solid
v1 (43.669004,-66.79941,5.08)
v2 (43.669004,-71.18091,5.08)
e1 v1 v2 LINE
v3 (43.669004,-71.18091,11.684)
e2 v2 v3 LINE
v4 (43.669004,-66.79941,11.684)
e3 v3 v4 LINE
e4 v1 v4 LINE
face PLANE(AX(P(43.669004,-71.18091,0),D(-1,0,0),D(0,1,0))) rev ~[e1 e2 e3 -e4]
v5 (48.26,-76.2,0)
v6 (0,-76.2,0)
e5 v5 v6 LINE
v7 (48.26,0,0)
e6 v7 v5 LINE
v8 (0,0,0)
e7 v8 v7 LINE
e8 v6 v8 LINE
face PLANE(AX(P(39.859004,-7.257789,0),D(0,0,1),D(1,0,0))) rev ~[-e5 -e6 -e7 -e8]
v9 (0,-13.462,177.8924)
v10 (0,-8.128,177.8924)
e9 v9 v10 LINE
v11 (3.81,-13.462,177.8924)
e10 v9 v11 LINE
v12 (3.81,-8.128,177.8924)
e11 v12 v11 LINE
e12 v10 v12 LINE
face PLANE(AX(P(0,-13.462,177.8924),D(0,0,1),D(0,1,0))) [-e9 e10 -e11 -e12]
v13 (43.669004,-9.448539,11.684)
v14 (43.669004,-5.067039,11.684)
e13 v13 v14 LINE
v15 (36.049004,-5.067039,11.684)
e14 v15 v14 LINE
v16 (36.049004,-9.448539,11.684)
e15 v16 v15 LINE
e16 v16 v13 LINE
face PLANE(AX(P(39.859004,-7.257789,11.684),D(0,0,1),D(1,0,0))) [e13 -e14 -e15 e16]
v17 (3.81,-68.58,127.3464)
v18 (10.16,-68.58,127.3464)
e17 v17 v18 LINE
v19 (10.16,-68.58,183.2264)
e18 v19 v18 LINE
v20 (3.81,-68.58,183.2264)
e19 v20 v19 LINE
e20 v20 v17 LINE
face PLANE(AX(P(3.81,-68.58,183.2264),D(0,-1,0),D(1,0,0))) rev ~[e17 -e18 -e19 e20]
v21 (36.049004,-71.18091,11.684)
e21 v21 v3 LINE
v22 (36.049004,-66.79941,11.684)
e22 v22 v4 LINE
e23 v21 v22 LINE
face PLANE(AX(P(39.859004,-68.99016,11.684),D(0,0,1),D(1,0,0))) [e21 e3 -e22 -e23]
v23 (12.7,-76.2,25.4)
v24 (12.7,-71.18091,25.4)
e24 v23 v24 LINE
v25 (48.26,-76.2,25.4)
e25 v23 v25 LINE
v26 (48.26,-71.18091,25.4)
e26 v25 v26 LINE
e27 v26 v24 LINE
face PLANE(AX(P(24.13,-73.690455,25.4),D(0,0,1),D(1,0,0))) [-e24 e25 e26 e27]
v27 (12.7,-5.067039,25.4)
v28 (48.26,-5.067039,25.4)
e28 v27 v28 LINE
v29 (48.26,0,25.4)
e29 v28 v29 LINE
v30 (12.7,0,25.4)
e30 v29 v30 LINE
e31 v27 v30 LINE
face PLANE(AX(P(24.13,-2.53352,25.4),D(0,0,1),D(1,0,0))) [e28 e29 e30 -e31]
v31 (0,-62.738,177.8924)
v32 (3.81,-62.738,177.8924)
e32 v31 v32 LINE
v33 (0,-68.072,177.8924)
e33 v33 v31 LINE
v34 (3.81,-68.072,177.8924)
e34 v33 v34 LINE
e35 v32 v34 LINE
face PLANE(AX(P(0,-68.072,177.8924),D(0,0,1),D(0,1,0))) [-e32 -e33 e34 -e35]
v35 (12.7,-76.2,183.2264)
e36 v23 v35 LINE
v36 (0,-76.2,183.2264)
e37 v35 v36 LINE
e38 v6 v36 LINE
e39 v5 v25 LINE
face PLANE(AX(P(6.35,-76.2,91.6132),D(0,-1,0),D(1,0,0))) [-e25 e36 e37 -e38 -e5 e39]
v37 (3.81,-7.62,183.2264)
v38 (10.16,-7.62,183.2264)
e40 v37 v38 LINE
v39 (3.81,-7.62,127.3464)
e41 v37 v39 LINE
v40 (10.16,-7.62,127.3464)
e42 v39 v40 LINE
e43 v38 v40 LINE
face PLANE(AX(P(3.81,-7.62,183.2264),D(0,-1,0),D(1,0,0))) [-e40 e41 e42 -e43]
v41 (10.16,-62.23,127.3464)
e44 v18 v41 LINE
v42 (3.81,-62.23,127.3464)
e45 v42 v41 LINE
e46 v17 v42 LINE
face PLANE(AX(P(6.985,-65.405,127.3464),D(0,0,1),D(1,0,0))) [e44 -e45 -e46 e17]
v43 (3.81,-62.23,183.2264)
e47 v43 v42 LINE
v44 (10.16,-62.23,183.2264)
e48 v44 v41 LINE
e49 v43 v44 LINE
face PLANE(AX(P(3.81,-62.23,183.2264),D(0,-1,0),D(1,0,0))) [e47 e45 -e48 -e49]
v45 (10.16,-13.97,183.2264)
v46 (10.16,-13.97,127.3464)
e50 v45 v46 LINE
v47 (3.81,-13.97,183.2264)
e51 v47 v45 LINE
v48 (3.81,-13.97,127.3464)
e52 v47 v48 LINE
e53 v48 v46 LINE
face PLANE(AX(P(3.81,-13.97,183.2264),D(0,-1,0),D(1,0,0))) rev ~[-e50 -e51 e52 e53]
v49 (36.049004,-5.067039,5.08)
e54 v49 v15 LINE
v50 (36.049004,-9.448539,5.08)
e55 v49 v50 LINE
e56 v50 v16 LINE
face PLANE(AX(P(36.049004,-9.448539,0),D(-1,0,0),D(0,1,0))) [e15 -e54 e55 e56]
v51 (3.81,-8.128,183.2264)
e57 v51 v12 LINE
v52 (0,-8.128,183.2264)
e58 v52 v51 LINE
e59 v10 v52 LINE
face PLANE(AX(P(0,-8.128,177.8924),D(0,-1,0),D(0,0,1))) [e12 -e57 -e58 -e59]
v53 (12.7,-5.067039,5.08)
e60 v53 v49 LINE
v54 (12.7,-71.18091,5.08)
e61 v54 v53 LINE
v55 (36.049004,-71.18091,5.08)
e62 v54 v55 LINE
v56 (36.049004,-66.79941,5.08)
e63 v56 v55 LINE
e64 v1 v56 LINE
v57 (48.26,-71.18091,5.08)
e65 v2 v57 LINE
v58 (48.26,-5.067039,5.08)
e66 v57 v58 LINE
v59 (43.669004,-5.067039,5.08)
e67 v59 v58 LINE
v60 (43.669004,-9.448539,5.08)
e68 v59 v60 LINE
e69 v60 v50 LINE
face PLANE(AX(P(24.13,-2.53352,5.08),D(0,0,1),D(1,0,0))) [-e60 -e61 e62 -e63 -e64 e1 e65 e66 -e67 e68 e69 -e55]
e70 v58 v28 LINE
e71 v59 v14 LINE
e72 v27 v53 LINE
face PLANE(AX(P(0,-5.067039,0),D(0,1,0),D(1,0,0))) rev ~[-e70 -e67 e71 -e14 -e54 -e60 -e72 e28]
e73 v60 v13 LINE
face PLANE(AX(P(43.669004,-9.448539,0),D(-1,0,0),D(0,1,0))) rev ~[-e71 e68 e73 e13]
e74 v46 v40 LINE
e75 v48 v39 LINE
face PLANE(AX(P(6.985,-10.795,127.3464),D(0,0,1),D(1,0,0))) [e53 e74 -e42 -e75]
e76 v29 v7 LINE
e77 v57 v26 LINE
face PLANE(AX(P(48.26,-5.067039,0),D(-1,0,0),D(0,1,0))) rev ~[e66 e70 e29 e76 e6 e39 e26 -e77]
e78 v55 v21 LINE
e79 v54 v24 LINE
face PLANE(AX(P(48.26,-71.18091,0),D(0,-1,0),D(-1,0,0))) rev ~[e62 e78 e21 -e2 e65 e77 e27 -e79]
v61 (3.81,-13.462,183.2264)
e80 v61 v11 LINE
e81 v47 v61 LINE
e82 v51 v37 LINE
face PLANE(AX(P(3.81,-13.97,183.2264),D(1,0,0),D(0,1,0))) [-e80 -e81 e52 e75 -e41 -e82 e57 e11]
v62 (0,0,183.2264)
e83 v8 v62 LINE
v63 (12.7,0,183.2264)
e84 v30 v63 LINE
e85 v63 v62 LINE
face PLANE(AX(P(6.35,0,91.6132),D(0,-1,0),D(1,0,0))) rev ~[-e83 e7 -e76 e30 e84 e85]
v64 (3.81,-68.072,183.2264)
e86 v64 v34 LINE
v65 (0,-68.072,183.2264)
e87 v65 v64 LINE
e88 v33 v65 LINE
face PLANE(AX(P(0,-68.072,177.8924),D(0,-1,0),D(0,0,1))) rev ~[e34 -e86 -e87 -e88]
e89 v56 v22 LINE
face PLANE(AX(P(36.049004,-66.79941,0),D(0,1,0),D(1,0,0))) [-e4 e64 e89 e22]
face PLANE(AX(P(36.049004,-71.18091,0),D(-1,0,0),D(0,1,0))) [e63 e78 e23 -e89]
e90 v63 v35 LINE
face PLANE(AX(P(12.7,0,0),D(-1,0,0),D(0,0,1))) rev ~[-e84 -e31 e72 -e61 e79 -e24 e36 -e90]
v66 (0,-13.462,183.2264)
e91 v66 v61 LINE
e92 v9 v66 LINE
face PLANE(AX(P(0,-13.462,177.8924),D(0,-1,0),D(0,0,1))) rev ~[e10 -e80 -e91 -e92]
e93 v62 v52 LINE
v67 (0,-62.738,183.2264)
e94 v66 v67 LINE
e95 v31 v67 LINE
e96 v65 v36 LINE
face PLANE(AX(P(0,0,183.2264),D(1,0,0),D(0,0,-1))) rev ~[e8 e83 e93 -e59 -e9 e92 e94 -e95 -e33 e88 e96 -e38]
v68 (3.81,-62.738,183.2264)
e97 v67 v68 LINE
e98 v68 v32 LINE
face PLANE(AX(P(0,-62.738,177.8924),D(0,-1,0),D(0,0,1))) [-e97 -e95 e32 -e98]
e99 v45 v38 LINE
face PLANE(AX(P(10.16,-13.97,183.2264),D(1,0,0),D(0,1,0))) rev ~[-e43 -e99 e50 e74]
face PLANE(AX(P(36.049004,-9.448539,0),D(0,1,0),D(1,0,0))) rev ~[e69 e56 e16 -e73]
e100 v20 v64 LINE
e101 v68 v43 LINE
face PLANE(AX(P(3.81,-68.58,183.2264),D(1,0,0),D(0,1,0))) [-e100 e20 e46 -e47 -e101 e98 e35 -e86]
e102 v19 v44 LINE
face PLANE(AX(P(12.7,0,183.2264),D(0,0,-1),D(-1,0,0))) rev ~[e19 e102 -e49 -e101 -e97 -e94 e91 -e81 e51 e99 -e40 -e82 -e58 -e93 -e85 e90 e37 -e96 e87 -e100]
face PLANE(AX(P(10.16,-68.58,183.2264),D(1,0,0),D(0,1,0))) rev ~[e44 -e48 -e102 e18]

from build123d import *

# Parameters (mm, degrees)
F1_DEPTH  = 76.2
F3_DEPTH  = 25.4
F4_DEPTH  = 5.08
F5_W      = 7.62
F5_H      = 4.3815
F6_DEPTH  = 11.684
F7_W      = 6.35
F7_H      = 6.35
F8_DEPTH  = 55.88
F9_W      = 5.334
F9_H      = 5.334
F10_DEPTH = 5.08


# Not quite as in the source:
# - a feature names something its author has since deleted; it is built from what else it names


with BuildPart() as f1:
    # F0 (on Front) → F1 (new body)
    with BuildSketch(Plane.XZ):
        Polygon((0, 0), (12.7, 0), (12.7, 5.4184001555), (12.7, 23.5612627981), (12.7, 183.226400471), (0, 183.226400471), align=None)
    extrude(amount=F1_DEPTH)

    # F2 (on Top) → F3 (join)
    with BuildSketch(Plane.XY):
        Polygon((43.18, 0), (0, 0), (0, -5.0670392811), (48.26, -5.0670392811), (48.26, 0), align=None)
        Polygon((27.7881938964, -71.1809098721), (0, -71.1809098721), (0, -76.2), (30.48, -76.2), (48.26, -76.2), (48.26, -71.1809098721), (35.56, -71.1809098721), align=None)
    extrude(amount=F3_DEPTH)

    # F2 (on Top) → F4 (join)
    with BuildSketch(Plane.XY):
        Polygon((43.18, 0), (0, 0), (0, -5.0670392811), (48.26, -5.0670392811), (48.26, 0), align=None)
        Polygon((48.26, -5.0670392811), (0, -5.0670392811), (0, -71.1809098721), (27.7881938964, -71.1809098721), (35.56, -71.1809098721), (48.26, -71.1809098721), align=None)
    extrude(amount=F4_DEPTH)

    # F5 (on Top) → F6 (join)
    with BuildSketch(Plane.XY):
        with Locations((39.8590039933, -7.2577892811)):
            Rectangle(F5_W, F5_H)
        with Locations((39.8590039933, -68.9901598721)):
            Rectangle(F5_W, F5_H)
    extrude(amount=F6_DEPTH)

    # F7 (on face) → F8 (cut)
    with BuildSketch(Plane.XY.offset(183.226400471)):
        with Locations((6.985, -10.795)):
            Rectangle(F7_W, F7_H)
        with Locations((6.985, -65.405)):
            Rectangle(F7_W, F7_H)
    extrude(amount=-F8_DEPTH, mode=Mode.SUBTRACT)

    # F9 (on Right) → F10 (cut)
    with BuildSketch(Plane.YZ):
        with Locations((-65.405, 180.559400471)):
            Rectangle(F9_W, F9_H)
        with Locations((-10.795, 180.559400471)):
            Rectangle(F9_W, F9_H)
    extrude(amount=F10_DEPTH, mode=Mode.SUBTRACT)


solid = f1.part
